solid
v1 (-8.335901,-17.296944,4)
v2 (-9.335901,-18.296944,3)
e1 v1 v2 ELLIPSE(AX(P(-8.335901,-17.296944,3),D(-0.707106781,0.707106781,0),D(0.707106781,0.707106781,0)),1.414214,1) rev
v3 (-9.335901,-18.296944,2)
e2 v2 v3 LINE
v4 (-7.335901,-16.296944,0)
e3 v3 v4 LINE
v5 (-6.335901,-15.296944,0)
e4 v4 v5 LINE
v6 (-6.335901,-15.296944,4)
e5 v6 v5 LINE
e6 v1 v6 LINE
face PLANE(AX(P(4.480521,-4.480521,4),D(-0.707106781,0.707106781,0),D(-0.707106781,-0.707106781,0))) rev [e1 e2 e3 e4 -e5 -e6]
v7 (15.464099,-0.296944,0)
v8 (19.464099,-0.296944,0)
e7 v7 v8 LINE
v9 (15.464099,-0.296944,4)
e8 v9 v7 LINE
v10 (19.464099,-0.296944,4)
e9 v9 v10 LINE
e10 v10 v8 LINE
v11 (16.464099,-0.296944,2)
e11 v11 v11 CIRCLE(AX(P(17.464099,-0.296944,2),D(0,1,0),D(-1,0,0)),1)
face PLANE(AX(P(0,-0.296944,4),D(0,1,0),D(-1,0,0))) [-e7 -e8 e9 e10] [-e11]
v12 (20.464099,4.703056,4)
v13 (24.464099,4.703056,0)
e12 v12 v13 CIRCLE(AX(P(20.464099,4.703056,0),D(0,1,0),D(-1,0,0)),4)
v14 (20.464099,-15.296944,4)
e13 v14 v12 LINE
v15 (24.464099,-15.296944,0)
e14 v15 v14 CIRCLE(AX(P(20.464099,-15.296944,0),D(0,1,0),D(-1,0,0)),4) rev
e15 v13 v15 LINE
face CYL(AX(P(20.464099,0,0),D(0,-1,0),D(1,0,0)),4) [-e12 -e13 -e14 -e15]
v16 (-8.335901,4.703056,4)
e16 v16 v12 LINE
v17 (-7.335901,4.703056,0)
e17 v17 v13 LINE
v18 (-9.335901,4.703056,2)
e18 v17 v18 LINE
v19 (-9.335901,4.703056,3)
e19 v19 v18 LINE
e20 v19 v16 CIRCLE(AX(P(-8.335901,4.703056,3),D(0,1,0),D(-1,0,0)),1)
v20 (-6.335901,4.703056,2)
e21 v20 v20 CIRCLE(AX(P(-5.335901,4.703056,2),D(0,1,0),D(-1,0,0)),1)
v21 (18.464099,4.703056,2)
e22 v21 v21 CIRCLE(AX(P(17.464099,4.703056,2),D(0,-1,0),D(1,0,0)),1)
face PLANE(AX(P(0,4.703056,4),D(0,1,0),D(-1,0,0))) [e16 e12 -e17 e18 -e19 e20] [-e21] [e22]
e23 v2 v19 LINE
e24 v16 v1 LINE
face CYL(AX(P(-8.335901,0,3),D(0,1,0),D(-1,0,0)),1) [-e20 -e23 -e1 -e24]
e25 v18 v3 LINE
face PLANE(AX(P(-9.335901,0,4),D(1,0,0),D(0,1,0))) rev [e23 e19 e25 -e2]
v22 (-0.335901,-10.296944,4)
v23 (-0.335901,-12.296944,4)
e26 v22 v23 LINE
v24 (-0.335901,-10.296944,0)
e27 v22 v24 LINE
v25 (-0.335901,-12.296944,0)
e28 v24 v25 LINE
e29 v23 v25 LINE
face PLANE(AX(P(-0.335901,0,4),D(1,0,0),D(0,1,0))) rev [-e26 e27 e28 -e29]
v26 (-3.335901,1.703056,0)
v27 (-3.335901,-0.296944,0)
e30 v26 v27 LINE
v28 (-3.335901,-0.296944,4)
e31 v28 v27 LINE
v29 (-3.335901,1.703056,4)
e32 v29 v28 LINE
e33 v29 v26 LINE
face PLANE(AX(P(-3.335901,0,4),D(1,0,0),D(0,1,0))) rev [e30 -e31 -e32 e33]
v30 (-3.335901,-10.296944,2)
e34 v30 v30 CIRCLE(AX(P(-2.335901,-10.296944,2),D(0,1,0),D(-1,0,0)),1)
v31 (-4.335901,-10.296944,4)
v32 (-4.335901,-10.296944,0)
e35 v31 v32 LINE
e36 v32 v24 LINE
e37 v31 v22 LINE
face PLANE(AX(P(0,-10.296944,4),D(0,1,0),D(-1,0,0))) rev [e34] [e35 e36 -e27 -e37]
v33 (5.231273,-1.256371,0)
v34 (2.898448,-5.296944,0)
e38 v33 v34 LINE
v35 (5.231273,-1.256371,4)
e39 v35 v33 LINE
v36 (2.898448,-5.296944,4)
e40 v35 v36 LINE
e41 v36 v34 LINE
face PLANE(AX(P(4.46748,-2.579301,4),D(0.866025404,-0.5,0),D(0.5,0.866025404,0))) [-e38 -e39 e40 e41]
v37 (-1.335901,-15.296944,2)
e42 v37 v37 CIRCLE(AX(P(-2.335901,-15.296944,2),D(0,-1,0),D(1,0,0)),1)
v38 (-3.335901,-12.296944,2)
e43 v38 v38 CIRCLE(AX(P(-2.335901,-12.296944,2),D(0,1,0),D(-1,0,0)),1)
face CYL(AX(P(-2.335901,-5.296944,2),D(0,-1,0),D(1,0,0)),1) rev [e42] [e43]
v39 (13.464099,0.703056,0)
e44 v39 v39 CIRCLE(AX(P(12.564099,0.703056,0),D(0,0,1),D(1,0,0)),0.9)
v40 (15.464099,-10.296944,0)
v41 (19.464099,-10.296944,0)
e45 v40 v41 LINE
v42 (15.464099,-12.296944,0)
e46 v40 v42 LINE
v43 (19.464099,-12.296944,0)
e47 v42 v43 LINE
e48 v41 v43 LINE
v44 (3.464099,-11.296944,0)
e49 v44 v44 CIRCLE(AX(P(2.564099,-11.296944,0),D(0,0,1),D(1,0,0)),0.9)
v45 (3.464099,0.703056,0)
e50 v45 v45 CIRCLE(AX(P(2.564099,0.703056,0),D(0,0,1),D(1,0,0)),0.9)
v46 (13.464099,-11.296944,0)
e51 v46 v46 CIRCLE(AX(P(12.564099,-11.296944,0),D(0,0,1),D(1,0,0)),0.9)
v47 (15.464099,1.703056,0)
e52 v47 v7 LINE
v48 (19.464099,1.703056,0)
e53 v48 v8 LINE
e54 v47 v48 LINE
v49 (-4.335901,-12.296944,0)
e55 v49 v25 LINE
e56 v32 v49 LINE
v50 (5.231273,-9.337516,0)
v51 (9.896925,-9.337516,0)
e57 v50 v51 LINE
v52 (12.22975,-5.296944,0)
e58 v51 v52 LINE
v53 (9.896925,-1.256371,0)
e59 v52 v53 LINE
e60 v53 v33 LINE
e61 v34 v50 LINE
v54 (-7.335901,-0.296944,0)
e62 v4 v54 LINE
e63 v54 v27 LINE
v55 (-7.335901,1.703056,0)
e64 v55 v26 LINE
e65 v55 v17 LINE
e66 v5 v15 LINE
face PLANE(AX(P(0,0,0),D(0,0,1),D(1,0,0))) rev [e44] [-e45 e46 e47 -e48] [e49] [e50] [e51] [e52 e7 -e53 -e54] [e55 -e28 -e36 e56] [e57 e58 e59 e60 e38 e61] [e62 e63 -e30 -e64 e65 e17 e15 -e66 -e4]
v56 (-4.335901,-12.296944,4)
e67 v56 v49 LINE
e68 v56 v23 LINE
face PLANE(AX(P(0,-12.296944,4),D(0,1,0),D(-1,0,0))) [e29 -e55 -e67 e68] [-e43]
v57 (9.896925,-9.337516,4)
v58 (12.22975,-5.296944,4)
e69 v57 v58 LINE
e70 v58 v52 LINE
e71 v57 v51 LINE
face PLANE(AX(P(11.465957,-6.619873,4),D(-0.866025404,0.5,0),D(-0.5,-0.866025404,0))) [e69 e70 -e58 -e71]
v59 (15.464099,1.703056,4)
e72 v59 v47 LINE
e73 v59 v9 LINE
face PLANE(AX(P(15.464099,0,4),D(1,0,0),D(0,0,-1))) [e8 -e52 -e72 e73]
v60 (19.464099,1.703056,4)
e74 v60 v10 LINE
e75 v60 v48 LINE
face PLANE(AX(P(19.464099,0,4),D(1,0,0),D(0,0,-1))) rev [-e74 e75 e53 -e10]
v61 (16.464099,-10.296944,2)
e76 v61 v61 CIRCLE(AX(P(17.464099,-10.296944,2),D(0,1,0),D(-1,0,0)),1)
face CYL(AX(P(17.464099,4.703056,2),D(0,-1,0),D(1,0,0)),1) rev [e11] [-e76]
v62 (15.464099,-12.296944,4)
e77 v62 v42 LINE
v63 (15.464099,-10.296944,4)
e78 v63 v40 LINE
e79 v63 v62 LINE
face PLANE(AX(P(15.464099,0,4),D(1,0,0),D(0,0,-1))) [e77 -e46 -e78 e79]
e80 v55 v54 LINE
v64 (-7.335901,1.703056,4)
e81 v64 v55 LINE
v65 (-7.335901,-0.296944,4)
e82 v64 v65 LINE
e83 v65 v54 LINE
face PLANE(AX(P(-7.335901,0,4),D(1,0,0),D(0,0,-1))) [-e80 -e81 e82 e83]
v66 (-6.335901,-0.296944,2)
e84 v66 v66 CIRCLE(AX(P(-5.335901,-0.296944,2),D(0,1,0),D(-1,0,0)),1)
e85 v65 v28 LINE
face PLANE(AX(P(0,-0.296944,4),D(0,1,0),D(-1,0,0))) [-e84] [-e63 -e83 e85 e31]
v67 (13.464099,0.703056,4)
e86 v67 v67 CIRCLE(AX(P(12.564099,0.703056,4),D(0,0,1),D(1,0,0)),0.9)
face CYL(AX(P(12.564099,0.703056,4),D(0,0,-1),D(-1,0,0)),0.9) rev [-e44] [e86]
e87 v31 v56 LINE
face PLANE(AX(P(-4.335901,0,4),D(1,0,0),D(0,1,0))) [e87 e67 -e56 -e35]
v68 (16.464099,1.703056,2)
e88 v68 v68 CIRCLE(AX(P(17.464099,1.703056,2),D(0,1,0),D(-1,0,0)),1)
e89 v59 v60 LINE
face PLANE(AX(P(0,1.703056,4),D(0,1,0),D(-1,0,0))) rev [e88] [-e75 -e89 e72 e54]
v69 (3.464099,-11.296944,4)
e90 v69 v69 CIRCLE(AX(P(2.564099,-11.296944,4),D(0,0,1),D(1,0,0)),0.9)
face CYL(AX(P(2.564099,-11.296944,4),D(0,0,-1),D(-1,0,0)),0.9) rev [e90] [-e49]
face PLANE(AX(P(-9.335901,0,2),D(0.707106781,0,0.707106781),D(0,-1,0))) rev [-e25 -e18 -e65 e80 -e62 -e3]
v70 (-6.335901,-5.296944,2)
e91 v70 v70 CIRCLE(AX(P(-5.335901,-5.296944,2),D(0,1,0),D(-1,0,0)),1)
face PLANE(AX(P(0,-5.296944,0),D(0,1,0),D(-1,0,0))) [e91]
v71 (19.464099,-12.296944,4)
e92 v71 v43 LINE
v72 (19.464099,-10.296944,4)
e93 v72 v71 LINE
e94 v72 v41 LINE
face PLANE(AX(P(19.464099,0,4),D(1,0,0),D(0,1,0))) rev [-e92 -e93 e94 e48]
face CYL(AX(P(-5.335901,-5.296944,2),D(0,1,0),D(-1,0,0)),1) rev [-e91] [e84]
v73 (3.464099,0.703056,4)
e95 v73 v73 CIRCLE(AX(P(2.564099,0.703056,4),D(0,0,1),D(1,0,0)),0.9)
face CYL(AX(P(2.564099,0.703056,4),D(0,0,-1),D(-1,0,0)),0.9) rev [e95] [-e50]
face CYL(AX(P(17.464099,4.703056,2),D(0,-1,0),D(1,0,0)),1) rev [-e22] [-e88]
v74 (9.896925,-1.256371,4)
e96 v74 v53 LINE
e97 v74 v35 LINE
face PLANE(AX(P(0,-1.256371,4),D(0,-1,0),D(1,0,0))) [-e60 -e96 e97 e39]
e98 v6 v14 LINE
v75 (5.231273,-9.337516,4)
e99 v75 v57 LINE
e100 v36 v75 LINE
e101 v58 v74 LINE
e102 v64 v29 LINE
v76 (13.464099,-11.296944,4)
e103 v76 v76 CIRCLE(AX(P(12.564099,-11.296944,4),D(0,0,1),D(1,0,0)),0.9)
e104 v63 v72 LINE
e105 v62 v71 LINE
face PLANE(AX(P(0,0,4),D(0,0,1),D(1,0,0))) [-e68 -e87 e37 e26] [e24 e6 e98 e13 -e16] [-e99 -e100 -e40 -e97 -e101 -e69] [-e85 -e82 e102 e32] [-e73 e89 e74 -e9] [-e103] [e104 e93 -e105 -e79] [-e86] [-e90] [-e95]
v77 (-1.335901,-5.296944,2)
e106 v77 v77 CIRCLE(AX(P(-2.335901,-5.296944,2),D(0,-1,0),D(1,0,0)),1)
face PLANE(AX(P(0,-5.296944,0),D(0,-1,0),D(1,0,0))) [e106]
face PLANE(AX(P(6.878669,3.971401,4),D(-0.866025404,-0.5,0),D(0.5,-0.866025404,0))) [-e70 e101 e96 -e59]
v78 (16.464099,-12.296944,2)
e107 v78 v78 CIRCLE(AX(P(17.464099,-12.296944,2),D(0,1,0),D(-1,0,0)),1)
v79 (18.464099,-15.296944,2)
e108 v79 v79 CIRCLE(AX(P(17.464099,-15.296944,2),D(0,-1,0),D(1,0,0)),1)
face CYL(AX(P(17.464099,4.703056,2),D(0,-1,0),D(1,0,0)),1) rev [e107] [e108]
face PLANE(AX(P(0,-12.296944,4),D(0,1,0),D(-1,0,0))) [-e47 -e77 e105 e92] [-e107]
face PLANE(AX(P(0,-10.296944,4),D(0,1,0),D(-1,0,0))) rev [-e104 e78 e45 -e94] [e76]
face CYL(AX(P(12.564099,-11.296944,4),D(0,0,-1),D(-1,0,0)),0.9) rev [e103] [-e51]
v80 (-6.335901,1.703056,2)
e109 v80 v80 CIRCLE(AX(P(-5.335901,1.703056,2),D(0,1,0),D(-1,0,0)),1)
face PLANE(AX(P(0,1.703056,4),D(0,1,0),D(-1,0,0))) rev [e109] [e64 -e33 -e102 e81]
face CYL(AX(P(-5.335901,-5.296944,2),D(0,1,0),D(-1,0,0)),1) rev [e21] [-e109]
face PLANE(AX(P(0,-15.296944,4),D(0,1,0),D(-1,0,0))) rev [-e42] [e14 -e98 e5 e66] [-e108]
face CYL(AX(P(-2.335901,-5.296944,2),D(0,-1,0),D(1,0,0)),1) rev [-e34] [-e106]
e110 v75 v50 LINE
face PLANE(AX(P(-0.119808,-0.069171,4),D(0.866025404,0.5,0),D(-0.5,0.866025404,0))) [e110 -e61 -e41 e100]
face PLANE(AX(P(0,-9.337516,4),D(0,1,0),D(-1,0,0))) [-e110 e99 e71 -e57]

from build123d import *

# Parameters (mm, degrees)
SKETCH1_W           = 4
SKETCH1_H           = 2
SKETCH1_R           = 0.9
BOSS_EXTRUDE1_DEPTH = 4
SKETCH3_R           = 1
CUT_EXTRUDE1_DEPTH  = 20
SKETCH3_3_R         = 1
CUT_EXTRUDE2_DEPTH  = 10
SKETCH5_R           = 1
CUT_EXTRUDE3_DEPTH  = 10
CHAMFER2_SIZE       = 2
FILLET2_R           = 1
FILLET3_R           = 4


with BuildPart() as part:
    # Sketch1 → Boss-Extrude1 (new body)
    # profile 1 of 2: a face of its own
    with BuildSketch(Plane.XY):
        Polygon((-9.335901083, -15.296943817), (-6.335901083, -15.296943817), (24.464098917, -15.296943817), (24.464098917, 4.703056183), (-9.335901083, 4.703056183), align=None)
        with Locations((-2.335901083, -11.296943817)):
            Rectangle(SKETCH1_W, SKETCH1_H, mode=Mode.SUBTRACT)
        with Locations((2.564098917, -11.296943817)):
            Circle(SKETCH1_R, mode=Mode.SUBTRACT)
        with Locations((12.564098917, -11.296943817)):
            Circle(SKETCH1_R, mode=Mode.SUBTRACT)
        with Locations((17.464098917, -11.296943817)):
            Rectangle(SKETCH1_W, SKETCH1_H, mode=Mode.SUBTRACT)
        with Locations((-5.335901083, 0.703056183)):
            Rectangle(SKETCH1_W, SKETCH1_H, mode=Mode.SUBTRACT)
        with Locations((2.564098917, 0.703056183)):
            Circle(SKETCH1_R, mode=Mode.SUBTRACT)
        Polygon((9.896924586, -1.256371234), (12.229750255, -5.296943817), (9.896924586, -9.337516401), (5.231273248, -9.337516401), (2.898447579, -5.296943817), (5.231273248, -1.256371234), align=None, mode=Mode.SUBTRACT)
        with Locations((12.564098917, 0.703056183)):
            Circle(SKETCH1_R, mode=Mode.SUBTRACT)
        with Locations((17.464098917, 0.703056183)):
            Rectangle(SKETCH1_W, SKETCH1_H, mode=Mode.SUBTRACT)
    # profile 2 of 2: a face of its own
    with BuildSketch(Plane.XY):
        Polygon((-9.335901083, -15.296943817), (-9.335901083, -18.296943817), (-6.335901083, -15.296943817), align=None)
    extrude(amount=BOSS_EXTRUDE1_DEPTH)

    # Sketch3 → Cut-Extrude1 (cut)
    with BuildSketch(Plane.XZ.offset(15.296943817)):
        with Locations((17.464098917, 2)):
            Circle(SKETCH3_R)
    extrude(amount=-CUT_EXTRUDE1_DEPTH, mode=Mode.SUBTRACT)

    # Sketch3<3> → Cut-Extrude2 (cut)
    with BuildSketch(Plane.XZ.offset(15.296943817)):
        with Locations((-2.335901083, 2)):
            Circle(SKETCH3_3_R)
    extrude(amount=-CUT_EXTRUDE2_DEPTH, mode=Mode.SUBTRACT)

    # Sketch5 → Cut-Extrude3 (cut)
    with BuildSketch(Plane(origin=(0, 4.703056183, 0), x_dir=(1, 0, 0), z_dir=(0, 1, 0))):
        with Locations(Location((-5.335901083, -2, 0), (0, 0, 180))):
            Circle(SKETCH5_R)
    extrude(amount=-CUT_EXTRUDE3_DEPTH, mode=Mode.SUBTRACT)

    # Chamfer2
    chamfer2_edges = [part.edges().sort_by_distance(p)[0] for p in [
        (-9.335901083, -6.796943817, 0),
    ]]
    chamfer(chamfer2_edges, length=CHAMFER2_SIZE - 0.0001)  # a hair under: the kernel refuses the full size

    # Fillet2
    fillet2_edges = [part.edges().sort_by_distance(p)[0] for p in [
        (-9.335901083, -6.796943817, 4),
    ]]
    fillet(fillet2_edges, radius=FILLET2_R)

    # Fillet3
    fillet3_edges = [part.edges().sort_by_distance(p)[0] for p in [
        (24.464098917, -5.296943817, 4),
    ]]
    fillet(fillet3_edges, radius=FILLET3_R - 0.0001)  # a hair under: the kernel refuses the full size


solid = part.part
